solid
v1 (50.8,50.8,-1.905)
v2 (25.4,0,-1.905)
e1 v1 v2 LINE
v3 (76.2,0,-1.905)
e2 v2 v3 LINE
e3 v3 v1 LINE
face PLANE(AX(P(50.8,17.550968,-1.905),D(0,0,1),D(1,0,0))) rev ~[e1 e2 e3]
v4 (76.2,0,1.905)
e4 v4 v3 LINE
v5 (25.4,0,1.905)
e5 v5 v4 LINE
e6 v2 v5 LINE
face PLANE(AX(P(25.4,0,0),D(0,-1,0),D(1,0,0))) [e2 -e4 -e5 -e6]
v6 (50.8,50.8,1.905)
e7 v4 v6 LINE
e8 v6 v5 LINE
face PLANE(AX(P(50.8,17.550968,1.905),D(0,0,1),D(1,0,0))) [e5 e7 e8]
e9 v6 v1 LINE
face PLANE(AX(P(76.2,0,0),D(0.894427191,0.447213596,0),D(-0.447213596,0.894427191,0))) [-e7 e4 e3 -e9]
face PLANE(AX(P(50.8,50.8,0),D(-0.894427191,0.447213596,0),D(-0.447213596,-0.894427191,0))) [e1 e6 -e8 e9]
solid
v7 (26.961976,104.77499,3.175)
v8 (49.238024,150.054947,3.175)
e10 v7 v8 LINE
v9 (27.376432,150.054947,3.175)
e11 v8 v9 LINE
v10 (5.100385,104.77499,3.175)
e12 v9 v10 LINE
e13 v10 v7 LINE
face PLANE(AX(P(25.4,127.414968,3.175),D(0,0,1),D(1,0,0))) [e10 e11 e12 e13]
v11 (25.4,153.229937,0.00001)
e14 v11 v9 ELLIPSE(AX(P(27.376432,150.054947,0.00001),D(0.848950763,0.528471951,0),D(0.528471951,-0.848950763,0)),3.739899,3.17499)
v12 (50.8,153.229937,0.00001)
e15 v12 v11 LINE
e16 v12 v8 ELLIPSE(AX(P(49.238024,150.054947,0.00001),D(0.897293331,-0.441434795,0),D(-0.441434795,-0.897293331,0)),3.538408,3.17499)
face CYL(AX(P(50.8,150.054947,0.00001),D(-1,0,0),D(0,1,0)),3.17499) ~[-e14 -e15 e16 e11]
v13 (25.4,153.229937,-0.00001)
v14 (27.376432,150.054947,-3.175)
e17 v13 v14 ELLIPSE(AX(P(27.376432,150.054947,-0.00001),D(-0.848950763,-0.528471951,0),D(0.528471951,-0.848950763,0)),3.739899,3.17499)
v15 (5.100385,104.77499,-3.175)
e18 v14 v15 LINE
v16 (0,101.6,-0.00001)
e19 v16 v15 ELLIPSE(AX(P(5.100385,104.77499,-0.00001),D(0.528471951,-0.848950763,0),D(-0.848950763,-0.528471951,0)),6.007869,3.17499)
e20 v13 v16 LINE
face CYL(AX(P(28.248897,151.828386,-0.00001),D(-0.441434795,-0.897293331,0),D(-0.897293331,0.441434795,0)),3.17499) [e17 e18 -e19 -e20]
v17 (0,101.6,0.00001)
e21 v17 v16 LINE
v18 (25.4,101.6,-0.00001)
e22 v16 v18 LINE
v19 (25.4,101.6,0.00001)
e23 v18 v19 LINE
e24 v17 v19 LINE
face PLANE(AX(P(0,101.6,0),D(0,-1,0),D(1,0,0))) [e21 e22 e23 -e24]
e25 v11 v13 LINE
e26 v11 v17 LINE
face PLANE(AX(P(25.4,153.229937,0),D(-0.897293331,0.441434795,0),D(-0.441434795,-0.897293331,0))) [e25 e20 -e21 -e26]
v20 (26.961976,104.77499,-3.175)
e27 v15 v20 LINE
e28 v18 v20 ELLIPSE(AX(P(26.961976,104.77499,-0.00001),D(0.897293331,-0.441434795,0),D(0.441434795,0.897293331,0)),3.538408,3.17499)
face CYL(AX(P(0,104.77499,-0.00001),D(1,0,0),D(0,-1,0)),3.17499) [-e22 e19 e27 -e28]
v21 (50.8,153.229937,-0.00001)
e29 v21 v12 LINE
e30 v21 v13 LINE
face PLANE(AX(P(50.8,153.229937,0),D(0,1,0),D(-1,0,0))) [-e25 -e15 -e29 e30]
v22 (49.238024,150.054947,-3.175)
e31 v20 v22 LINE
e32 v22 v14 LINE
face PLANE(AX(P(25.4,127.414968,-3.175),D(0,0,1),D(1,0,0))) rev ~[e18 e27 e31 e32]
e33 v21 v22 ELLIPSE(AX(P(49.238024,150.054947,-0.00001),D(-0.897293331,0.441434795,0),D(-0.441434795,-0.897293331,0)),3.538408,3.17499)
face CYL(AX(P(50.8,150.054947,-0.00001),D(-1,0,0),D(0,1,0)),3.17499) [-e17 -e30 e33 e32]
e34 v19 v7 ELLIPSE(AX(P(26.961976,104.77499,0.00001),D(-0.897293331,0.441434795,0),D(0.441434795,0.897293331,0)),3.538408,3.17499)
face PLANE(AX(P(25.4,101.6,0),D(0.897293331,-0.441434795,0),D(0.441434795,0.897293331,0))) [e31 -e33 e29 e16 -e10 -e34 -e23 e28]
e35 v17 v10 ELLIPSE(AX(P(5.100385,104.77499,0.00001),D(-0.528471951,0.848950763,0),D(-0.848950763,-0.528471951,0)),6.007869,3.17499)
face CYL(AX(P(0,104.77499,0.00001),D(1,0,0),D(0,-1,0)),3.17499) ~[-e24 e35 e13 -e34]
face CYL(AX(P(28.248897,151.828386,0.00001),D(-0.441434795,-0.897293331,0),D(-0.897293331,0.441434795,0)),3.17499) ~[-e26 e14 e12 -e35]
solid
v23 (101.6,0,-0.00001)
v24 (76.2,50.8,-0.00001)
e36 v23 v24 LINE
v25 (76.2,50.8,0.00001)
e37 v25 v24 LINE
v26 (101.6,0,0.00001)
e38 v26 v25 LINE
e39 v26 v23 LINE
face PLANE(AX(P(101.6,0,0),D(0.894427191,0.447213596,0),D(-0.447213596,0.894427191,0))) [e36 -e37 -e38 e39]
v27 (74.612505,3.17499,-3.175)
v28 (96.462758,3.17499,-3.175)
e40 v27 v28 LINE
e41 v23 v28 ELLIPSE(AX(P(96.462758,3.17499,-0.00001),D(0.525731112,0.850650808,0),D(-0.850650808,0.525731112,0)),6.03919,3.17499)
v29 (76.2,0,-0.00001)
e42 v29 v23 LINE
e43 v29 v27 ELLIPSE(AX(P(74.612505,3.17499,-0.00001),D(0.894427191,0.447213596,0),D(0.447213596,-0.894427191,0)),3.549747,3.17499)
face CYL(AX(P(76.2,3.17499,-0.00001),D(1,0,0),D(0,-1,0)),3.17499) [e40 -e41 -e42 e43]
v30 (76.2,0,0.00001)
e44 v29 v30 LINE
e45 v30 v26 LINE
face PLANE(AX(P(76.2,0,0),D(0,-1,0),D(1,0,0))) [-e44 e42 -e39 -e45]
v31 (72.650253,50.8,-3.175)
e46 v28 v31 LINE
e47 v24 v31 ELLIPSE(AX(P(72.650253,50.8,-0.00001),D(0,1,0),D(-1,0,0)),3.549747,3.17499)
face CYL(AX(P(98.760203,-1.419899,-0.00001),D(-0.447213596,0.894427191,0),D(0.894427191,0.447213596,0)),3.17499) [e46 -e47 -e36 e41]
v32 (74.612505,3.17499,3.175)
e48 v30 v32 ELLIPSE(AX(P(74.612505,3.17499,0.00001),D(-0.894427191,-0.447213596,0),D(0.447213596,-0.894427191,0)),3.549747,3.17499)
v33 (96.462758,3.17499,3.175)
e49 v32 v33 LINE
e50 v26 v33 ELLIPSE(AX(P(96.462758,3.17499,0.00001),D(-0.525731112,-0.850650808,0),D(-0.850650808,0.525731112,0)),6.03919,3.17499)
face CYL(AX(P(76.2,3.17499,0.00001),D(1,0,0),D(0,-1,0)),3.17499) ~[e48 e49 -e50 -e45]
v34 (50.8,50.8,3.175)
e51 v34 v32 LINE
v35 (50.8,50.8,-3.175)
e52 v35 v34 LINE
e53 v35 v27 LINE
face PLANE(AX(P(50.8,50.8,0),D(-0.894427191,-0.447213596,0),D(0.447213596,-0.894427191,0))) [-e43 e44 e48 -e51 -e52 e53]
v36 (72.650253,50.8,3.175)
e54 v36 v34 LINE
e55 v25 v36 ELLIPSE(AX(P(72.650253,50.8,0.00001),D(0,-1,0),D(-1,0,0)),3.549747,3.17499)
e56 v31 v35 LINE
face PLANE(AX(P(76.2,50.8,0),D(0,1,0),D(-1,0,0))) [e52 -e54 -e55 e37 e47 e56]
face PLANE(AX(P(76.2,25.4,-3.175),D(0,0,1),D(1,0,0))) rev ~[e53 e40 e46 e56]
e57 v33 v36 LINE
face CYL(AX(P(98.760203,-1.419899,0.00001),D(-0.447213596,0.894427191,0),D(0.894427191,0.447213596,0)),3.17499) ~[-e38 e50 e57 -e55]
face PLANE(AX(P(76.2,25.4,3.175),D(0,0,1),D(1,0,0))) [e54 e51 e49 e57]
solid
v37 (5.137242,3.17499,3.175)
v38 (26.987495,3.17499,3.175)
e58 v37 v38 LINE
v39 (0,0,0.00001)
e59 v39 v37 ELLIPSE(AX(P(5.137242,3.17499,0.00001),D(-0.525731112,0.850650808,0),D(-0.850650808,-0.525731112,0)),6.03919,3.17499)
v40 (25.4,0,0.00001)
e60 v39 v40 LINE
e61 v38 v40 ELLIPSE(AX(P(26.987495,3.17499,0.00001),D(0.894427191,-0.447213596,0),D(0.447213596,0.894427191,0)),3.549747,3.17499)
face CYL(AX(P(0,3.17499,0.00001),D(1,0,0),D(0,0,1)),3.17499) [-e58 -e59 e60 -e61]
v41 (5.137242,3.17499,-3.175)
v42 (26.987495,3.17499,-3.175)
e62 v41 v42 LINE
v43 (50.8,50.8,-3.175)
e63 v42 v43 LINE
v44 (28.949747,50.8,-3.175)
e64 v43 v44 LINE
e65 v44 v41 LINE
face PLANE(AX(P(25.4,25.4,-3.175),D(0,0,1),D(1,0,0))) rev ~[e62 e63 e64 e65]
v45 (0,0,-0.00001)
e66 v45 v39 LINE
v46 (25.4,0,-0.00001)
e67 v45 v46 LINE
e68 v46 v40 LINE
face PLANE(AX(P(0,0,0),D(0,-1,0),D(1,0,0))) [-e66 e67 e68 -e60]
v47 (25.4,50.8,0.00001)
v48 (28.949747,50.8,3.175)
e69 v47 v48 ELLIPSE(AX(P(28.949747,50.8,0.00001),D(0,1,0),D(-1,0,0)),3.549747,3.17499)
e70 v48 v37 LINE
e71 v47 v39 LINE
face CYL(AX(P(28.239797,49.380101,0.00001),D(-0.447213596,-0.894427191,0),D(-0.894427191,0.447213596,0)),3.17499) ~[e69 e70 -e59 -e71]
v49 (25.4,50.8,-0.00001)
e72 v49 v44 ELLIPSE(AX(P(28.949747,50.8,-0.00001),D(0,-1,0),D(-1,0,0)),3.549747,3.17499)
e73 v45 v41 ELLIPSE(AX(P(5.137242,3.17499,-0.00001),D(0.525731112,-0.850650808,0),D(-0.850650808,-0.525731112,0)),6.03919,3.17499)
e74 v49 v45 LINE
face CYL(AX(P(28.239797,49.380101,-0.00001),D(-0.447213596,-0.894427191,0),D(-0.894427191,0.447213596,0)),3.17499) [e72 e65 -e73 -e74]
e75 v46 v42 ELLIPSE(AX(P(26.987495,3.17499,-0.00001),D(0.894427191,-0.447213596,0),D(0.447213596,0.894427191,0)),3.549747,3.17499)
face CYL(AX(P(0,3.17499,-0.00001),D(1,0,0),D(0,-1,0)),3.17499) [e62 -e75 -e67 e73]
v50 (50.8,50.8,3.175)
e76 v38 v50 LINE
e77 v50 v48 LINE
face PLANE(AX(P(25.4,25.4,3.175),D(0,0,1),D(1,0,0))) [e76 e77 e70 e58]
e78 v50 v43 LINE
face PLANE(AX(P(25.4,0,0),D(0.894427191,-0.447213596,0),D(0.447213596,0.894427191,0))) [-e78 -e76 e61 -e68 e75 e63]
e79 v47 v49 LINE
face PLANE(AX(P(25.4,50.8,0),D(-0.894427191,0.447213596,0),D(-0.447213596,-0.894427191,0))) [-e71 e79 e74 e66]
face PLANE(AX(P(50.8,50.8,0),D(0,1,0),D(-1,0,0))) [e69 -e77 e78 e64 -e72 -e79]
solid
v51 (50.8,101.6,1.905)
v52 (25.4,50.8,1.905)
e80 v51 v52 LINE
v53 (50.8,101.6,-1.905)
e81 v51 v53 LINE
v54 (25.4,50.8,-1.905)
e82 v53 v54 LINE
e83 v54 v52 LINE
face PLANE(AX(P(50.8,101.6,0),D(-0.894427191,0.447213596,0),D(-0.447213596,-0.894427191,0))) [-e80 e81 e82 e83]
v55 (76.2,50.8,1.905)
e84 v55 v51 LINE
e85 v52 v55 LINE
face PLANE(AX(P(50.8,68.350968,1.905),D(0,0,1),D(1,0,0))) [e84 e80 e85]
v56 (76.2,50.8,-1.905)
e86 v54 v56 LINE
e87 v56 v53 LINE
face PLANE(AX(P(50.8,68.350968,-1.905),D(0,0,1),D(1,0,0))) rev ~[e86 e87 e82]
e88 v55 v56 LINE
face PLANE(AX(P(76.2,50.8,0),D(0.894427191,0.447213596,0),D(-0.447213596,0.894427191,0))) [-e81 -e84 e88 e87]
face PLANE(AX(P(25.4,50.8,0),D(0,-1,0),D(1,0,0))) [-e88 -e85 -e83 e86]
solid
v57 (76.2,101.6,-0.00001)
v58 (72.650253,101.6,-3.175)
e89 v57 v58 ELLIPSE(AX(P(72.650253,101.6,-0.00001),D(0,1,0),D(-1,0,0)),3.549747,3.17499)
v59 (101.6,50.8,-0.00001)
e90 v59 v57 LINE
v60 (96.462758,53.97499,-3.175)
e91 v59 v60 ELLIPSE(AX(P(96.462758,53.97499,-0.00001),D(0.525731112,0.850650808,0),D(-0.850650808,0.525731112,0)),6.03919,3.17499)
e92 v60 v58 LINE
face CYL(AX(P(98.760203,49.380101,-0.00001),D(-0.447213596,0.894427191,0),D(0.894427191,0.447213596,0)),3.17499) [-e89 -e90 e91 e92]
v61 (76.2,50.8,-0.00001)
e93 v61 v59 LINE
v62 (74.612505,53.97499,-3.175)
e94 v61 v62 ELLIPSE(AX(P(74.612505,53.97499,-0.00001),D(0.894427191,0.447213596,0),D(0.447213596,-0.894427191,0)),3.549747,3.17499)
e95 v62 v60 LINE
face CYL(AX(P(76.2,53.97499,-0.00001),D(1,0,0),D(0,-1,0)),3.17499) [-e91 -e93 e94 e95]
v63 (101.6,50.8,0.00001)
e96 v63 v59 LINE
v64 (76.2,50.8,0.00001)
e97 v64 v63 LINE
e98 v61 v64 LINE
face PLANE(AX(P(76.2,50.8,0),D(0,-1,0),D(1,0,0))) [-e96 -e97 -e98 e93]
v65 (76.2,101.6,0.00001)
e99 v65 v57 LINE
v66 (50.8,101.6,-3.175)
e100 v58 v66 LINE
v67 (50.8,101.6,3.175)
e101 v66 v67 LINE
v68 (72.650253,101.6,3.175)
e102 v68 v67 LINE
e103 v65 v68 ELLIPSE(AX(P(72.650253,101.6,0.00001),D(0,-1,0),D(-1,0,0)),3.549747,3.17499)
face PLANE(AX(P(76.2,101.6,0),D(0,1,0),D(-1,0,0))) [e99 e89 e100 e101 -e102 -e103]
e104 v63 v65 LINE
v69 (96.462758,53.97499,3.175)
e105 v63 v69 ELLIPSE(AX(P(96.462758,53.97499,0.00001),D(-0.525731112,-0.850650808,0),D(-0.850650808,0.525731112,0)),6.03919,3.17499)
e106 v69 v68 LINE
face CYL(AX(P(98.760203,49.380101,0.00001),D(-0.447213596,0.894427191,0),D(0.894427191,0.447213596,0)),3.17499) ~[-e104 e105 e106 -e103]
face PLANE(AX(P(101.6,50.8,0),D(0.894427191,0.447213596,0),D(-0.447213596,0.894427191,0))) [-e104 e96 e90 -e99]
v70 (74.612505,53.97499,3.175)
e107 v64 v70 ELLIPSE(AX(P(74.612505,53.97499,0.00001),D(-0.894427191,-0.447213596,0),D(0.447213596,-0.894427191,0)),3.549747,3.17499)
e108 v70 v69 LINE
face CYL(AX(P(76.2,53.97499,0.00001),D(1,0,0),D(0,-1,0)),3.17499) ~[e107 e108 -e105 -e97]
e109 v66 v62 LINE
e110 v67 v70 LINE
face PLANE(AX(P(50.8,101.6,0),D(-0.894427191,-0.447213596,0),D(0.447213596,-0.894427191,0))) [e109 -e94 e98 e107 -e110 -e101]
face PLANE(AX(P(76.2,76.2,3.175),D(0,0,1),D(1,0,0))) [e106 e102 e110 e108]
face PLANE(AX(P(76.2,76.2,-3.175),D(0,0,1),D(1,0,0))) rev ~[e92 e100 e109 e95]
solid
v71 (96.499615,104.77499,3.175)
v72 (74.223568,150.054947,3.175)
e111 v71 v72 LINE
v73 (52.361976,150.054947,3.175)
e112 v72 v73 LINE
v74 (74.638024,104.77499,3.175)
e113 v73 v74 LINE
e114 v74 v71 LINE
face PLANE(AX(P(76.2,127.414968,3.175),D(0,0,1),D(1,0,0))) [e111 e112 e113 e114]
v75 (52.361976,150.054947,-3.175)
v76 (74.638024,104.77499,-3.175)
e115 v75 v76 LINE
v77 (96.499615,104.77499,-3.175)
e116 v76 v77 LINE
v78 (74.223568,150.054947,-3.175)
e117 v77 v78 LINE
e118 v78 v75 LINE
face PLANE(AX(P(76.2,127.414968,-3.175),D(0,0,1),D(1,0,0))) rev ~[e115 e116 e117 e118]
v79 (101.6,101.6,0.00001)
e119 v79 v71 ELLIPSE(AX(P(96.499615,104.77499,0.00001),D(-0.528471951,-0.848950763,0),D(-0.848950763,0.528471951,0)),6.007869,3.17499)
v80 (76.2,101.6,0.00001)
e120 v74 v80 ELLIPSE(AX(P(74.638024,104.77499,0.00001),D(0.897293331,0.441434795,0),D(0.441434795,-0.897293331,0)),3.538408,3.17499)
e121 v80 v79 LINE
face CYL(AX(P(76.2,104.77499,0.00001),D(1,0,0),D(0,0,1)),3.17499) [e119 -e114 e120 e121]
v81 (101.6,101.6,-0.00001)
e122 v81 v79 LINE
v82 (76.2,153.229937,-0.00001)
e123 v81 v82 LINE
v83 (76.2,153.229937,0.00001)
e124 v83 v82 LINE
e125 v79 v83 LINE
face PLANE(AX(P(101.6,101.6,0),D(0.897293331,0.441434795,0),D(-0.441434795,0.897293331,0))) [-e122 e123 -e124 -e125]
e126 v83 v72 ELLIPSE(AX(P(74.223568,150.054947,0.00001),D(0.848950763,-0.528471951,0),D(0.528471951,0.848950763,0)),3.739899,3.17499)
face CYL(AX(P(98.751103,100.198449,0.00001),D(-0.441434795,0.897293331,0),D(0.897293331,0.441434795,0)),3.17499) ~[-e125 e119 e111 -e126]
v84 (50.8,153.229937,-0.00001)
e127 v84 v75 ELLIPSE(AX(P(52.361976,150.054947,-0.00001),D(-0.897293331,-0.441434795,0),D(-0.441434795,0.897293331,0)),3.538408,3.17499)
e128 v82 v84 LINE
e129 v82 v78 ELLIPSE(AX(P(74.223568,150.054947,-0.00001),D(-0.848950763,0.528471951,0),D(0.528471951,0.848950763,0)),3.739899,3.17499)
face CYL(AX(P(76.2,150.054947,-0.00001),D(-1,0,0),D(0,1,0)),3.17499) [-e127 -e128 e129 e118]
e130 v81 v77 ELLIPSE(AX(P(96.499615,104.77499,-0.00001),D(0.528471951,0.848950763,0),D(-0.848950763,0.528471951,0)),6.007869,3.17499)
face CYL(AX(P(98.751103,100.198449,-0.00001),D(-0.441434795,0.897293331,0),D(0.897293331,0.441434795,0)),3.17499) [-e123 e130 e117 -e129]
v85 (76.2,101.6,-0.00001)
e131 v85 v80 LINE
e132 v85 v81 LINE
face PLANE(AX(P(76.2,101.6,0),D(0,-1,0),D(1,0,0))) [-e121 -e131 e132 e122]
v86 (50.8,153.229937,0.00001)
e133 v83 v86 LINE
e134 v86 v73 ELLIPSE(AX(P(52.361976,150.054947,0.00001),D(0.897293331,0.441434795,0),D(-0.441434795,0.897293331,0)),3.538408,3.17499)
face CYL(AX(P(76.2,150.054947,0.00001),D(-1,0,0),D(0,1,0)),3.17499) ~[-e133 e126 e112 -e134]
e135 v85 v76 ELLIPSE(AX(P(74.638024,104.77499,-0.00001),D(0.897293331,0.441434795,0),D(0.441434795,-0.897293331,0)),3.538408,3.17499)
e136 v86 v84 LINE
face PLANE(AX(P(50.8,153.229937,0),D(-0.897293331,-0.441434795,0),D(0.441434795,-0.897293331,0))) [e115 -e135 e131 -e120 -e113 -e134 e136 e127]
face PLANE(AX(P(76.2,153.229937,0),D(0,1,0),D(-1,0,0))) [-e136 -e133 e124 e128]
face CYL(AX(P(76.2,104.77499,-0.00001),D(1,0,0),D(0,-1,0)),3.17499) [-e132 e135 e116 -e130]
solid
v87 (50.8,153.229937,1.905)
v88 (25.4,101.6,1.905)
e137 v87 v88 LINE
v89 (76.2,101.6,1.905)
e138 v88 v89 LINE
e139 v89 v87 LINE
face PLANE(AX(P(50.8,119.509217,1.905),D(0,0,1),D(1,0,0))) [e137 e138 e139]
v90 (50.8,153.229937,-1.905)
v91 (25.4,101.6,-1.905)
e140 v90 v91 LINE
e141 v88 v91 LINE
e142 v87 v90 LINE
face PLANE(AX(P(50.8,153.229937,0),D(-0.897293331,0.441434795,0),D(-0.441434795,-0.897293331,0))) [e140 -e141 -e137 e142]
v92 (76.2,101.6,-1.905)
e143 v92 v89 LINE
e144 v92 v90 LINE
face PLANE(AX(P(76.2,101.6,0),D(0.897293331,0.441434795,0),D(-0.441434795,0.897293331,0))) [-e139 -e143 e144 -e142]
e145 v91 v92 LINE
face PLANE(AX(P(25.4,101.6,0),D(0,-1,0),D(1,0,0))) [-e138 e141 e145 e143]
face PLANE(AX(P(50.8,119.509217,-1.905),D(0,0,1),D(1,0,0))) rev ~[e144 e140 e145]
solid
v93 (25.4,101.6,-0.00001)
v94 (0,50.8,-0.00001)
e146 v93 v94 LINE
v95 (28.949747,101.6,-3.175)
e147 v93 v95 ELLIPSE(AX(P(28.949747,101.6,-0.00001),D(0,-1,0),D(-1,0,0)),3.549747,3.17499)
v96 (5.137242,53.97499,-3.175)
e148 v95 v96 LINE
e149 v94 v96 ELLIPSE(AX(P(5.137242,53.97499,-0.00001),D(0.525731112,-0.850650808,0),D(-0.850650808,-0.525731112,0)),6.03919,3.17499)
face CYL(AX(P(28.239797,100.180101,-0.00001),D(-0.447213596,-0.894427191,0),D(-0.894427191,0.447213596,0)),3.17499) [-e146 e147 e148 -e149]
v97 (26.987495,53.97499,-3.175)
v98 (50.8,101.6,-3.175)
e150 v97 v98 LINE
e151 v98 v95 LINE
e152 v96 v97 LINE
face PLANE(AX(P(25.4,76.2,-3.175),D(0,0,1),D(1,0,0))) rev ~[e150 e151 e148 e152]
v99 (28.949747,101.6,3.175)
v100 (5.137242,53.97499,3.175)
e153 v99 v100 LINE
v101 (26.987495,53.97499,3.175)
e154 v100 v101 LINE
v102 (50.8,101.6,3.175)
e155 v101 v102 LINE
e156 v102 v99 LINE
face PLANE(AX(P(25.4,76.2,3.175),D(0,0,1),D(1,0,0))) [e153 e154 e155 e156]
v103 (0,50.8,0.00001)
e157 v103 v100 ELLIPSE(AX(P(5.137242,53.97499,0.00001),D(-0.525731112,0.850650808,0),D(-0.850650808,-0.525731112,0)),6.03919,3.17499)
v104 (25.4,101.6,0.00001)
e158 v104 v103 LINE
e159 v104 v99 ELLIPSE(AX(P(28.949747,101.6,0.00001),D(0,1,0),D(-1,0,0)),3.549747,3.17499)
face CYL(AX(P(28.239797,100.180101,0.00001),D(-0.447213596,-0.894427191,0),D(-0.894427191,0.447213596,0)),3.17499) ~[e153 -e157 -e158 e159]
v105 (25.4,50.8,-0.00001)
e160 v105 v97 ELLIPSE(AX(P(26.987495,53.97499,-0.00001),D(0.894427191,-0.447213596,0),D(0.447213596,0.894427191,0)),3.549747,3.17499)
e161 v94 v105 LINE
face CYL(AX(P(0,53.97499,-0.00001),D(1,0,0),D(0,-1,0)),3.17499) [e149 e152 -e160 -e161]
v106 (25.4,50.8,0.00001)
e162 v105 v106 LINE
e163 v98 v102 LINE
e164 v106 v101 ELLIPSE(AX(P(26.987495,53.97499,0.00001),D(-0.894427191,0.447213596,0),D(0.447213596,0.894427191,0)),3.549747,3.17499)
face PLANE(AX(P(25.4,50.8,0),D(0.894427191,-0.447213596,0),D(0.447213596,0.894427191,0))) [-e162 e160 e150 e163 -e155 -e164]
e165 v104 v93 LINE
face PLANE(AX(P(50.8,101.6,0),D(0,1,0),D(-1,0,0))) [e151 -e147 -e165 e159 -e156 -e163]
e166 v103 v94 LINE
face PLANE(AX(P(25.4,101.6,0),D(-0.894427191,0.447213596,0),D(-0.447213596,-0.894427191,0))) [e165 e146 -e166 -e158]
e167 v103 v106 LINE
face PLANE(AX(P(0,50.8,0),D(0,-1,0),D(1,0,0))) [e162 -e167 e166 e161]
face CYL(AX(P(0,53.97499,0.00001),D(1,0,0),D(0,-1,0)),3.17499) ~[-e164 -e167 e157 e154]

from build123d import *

# Parameters (mm, degrees)
F1_DEPTH = 3.175
F2_DEPTH = 1.905
F3_R     = 3.17499
F3_2_R   = 3.17499
F3_3_R   = 3.17499
F3_4_R   = 3.17499
F3_5_R   = 3.17499
F3_6_R   = 3.17499


# Not quite as in the source:
# - a fillet or chamfer is up to 0.001 mm smaller than in the source, because OpenCascade refuses the exact size


with BuildPart() as f1:
    # F0 (on Top) → F1 (new body, symmetric)
    with BuildSketch(Plane.XY):
        Polygon((0, 101.6), (25.4, 101.6), (50.8, 153.2299369574), (25.4, 153.2299369574), align=None)
    extrude(amount=F1_DEPTH, both=True)

    # F3#3 (radius 3.175 in the source; OpenCascade refuses exactly that, so slightly less here)
    f3_3_edges = [f1.edges().sort_by_distance(p)[0] for p in [
        (12.7, 127.414968, 3.175),
        (12.7, 127.414968, -3.175),
        (38.1, 153.229937, -3.175),
        (38.1, 153.229937, 3.175),
        (12.7, 101.6, 3.175),
        (12.7, 101.6, -3.175),
    ]]
    fillet(f3_3_edges, radius=F3_3_R)


with BuildPart() as f1b:
    # F0 (on Top) → F1, piece 2 (new body, symmetric)
    with BuildSketch(Plane.XY):
        Polygon((50.8, 153.2299369574), (76.2, 101.6), (101.6, 101.6), (76.2, 153.2299369574), align=None)
    extrude(amount=F1_DEPTH, both=True)

    # F3#4 (radius 3.175 in the source; OpenCascade refuses exactly that, so slightly less here)
    f3_4_edges = [f1b.edges().sort_by_distance(p)[0] for p in [
        (88.9, 127.414968, 3.175),
        (88.9, 127.414968, -3.175),
        (63.5, 153.229937, 3.175),
        (63.5, 153.229937, -3.175),
        (88.9, 101.6, 3.175),
        (88.9, 101.6, -3.175),
    ]]
    fillet(f3_4_edges, radius=F3_4_R)


with BuildPart() as f1c:
    # F0 (on Top) → F1, piece 3 (new body, symmetric)
    with BuildSketch(Plane.XY):
        Polygon((76.2, 101.6), (50.8, 101.6), (76.2, 50.8), (101.6, 50.8), align=None)
    extrude(amount=F1_DEPTH, both=True)

    # F3#5 (radius 3.175 in the source; OpenCascade refuses exactly that, so slightly less here)
    f3_5_edges = [f1c.edges().sort_by_distance(p)[0] for p in [
        (88.9, 76.2, 3.175),
        (88.9, 76.2, -3.175),
        (88.9, 50.8, -3.175),
        (88.9, 50.8, 3.175),
    ]]
    fillet(f3_5_edges, radius=F3_5_R)


with BuildPart() as f1d:
    # F0 (on Top) → F1, piece 4 (new body, symmetric)
    with BuildSketch(Plane.XY):
        Polygon((0, 50.8), (25.4, 50.8), (50.8, 101.6), (25.4, 101.6), align=None)
    extrude(amount=F1_DEPTH, both=True)

    # F3#2 (radius 3.175 in the source; OpenCascade refuses exactly that, so slightly less here)
    f3_2_edges = [f1d.edges().sort_by_distance(p)[0] for p in [
        (12.7, 76.2, 3.175),
        (12.7, 76.2, -3.175),
        (12.7, 50.8, 3.175),
        (12.7, 50.8, -3.175),
    ]]
    fillet(f3_2_edges, radius=F3_2_R)


with BuildPart() as f1e:
    # F0 (on Top) → F1, piece 5 (new body, symmetric)
    with BuildSketch(Plane.XY):
        Polygon((25.4, 50.8), (0, 0), (25.4, 0), (50.8, 50.8), align=None)
    extrude(amount=F1_DEPTH, both=True)

    # F3 (radius 3.175 in the source; OpenCascade refuses exactly that, so slightly less here)
    f3_edges = [f1e.edges().sort_by_distance(p)[0] for p in [
        (12.7, 25.4, 3.175),
        (12.7, 25.4, -3.175),
        (12.7, 0, 3.175),
        (12.7, 0, -3.175),
    ]]
    fillet(f3_edges, radius=F3_R)


with BuildPart() as f1f:
    # F0 (on Top) → F1, piece 6 (new body, symmetric)
    with BuildSketch(Plane.XY):
        Polygon((76.2, 50.8), (50.8, 50.8), (76.2, 0), (101.6, 0), align=None)
    extrude(amount=F1_DEPTH, both=True)

    # F3#6 (radius 3.175 in the source; OpenCascade refuses exactly that, so slightly less here)
    f3_6_edges = [f1f.edges().sort_by_distance(p)[0] for p in [
        (88.9, 25.4, 3.175),
        (88.9, 25.4, -3.175),
        (88.9, 0, 3.175),
        (88.9, 0, -3.175),
    ]]
    fillet(f3_6_edges, radius=F3_6_R)


with BuildPart() as f2:
    # F0 (on Top) → F2 (new body, symmetric)
    with BuildSketch(Plane.XY):
        Polygon((25.4, 101.6), (50.8, 101.6), (76.2, 101.6), (50.8, 153.2299369574), align=None)
    extrude(amount=F2_DEPTH, both=True)


with BuildPart() as f2b:
    # F0 (on Top) → F2, piece 2 (new body, symmetric)
    with BuildSketch(Plane.XY):
        Polygon((50.8, 101.6), (25.4, 50.8), (50.8, 50.8), (76.2, 50.8), align=None)
    extrude(amount=F2_DEPTH, both=True)


with BuildPart() as f2c:
    # F0 (on Top) → F2, piece 3 (new body, symmetric)
    with BuildSketch(Plane.XY):
        Polygon((50.8, 50.8), (25.4, 0), (76.2, 0), align=None)
    extrude(amount=F2_DEPTH, both=True)


solid = Compound([f1.part, f1b.part, f1c.part, f1d.part, f1e.part, f1f.part, f2.part, f2b.part, f2c.part])
